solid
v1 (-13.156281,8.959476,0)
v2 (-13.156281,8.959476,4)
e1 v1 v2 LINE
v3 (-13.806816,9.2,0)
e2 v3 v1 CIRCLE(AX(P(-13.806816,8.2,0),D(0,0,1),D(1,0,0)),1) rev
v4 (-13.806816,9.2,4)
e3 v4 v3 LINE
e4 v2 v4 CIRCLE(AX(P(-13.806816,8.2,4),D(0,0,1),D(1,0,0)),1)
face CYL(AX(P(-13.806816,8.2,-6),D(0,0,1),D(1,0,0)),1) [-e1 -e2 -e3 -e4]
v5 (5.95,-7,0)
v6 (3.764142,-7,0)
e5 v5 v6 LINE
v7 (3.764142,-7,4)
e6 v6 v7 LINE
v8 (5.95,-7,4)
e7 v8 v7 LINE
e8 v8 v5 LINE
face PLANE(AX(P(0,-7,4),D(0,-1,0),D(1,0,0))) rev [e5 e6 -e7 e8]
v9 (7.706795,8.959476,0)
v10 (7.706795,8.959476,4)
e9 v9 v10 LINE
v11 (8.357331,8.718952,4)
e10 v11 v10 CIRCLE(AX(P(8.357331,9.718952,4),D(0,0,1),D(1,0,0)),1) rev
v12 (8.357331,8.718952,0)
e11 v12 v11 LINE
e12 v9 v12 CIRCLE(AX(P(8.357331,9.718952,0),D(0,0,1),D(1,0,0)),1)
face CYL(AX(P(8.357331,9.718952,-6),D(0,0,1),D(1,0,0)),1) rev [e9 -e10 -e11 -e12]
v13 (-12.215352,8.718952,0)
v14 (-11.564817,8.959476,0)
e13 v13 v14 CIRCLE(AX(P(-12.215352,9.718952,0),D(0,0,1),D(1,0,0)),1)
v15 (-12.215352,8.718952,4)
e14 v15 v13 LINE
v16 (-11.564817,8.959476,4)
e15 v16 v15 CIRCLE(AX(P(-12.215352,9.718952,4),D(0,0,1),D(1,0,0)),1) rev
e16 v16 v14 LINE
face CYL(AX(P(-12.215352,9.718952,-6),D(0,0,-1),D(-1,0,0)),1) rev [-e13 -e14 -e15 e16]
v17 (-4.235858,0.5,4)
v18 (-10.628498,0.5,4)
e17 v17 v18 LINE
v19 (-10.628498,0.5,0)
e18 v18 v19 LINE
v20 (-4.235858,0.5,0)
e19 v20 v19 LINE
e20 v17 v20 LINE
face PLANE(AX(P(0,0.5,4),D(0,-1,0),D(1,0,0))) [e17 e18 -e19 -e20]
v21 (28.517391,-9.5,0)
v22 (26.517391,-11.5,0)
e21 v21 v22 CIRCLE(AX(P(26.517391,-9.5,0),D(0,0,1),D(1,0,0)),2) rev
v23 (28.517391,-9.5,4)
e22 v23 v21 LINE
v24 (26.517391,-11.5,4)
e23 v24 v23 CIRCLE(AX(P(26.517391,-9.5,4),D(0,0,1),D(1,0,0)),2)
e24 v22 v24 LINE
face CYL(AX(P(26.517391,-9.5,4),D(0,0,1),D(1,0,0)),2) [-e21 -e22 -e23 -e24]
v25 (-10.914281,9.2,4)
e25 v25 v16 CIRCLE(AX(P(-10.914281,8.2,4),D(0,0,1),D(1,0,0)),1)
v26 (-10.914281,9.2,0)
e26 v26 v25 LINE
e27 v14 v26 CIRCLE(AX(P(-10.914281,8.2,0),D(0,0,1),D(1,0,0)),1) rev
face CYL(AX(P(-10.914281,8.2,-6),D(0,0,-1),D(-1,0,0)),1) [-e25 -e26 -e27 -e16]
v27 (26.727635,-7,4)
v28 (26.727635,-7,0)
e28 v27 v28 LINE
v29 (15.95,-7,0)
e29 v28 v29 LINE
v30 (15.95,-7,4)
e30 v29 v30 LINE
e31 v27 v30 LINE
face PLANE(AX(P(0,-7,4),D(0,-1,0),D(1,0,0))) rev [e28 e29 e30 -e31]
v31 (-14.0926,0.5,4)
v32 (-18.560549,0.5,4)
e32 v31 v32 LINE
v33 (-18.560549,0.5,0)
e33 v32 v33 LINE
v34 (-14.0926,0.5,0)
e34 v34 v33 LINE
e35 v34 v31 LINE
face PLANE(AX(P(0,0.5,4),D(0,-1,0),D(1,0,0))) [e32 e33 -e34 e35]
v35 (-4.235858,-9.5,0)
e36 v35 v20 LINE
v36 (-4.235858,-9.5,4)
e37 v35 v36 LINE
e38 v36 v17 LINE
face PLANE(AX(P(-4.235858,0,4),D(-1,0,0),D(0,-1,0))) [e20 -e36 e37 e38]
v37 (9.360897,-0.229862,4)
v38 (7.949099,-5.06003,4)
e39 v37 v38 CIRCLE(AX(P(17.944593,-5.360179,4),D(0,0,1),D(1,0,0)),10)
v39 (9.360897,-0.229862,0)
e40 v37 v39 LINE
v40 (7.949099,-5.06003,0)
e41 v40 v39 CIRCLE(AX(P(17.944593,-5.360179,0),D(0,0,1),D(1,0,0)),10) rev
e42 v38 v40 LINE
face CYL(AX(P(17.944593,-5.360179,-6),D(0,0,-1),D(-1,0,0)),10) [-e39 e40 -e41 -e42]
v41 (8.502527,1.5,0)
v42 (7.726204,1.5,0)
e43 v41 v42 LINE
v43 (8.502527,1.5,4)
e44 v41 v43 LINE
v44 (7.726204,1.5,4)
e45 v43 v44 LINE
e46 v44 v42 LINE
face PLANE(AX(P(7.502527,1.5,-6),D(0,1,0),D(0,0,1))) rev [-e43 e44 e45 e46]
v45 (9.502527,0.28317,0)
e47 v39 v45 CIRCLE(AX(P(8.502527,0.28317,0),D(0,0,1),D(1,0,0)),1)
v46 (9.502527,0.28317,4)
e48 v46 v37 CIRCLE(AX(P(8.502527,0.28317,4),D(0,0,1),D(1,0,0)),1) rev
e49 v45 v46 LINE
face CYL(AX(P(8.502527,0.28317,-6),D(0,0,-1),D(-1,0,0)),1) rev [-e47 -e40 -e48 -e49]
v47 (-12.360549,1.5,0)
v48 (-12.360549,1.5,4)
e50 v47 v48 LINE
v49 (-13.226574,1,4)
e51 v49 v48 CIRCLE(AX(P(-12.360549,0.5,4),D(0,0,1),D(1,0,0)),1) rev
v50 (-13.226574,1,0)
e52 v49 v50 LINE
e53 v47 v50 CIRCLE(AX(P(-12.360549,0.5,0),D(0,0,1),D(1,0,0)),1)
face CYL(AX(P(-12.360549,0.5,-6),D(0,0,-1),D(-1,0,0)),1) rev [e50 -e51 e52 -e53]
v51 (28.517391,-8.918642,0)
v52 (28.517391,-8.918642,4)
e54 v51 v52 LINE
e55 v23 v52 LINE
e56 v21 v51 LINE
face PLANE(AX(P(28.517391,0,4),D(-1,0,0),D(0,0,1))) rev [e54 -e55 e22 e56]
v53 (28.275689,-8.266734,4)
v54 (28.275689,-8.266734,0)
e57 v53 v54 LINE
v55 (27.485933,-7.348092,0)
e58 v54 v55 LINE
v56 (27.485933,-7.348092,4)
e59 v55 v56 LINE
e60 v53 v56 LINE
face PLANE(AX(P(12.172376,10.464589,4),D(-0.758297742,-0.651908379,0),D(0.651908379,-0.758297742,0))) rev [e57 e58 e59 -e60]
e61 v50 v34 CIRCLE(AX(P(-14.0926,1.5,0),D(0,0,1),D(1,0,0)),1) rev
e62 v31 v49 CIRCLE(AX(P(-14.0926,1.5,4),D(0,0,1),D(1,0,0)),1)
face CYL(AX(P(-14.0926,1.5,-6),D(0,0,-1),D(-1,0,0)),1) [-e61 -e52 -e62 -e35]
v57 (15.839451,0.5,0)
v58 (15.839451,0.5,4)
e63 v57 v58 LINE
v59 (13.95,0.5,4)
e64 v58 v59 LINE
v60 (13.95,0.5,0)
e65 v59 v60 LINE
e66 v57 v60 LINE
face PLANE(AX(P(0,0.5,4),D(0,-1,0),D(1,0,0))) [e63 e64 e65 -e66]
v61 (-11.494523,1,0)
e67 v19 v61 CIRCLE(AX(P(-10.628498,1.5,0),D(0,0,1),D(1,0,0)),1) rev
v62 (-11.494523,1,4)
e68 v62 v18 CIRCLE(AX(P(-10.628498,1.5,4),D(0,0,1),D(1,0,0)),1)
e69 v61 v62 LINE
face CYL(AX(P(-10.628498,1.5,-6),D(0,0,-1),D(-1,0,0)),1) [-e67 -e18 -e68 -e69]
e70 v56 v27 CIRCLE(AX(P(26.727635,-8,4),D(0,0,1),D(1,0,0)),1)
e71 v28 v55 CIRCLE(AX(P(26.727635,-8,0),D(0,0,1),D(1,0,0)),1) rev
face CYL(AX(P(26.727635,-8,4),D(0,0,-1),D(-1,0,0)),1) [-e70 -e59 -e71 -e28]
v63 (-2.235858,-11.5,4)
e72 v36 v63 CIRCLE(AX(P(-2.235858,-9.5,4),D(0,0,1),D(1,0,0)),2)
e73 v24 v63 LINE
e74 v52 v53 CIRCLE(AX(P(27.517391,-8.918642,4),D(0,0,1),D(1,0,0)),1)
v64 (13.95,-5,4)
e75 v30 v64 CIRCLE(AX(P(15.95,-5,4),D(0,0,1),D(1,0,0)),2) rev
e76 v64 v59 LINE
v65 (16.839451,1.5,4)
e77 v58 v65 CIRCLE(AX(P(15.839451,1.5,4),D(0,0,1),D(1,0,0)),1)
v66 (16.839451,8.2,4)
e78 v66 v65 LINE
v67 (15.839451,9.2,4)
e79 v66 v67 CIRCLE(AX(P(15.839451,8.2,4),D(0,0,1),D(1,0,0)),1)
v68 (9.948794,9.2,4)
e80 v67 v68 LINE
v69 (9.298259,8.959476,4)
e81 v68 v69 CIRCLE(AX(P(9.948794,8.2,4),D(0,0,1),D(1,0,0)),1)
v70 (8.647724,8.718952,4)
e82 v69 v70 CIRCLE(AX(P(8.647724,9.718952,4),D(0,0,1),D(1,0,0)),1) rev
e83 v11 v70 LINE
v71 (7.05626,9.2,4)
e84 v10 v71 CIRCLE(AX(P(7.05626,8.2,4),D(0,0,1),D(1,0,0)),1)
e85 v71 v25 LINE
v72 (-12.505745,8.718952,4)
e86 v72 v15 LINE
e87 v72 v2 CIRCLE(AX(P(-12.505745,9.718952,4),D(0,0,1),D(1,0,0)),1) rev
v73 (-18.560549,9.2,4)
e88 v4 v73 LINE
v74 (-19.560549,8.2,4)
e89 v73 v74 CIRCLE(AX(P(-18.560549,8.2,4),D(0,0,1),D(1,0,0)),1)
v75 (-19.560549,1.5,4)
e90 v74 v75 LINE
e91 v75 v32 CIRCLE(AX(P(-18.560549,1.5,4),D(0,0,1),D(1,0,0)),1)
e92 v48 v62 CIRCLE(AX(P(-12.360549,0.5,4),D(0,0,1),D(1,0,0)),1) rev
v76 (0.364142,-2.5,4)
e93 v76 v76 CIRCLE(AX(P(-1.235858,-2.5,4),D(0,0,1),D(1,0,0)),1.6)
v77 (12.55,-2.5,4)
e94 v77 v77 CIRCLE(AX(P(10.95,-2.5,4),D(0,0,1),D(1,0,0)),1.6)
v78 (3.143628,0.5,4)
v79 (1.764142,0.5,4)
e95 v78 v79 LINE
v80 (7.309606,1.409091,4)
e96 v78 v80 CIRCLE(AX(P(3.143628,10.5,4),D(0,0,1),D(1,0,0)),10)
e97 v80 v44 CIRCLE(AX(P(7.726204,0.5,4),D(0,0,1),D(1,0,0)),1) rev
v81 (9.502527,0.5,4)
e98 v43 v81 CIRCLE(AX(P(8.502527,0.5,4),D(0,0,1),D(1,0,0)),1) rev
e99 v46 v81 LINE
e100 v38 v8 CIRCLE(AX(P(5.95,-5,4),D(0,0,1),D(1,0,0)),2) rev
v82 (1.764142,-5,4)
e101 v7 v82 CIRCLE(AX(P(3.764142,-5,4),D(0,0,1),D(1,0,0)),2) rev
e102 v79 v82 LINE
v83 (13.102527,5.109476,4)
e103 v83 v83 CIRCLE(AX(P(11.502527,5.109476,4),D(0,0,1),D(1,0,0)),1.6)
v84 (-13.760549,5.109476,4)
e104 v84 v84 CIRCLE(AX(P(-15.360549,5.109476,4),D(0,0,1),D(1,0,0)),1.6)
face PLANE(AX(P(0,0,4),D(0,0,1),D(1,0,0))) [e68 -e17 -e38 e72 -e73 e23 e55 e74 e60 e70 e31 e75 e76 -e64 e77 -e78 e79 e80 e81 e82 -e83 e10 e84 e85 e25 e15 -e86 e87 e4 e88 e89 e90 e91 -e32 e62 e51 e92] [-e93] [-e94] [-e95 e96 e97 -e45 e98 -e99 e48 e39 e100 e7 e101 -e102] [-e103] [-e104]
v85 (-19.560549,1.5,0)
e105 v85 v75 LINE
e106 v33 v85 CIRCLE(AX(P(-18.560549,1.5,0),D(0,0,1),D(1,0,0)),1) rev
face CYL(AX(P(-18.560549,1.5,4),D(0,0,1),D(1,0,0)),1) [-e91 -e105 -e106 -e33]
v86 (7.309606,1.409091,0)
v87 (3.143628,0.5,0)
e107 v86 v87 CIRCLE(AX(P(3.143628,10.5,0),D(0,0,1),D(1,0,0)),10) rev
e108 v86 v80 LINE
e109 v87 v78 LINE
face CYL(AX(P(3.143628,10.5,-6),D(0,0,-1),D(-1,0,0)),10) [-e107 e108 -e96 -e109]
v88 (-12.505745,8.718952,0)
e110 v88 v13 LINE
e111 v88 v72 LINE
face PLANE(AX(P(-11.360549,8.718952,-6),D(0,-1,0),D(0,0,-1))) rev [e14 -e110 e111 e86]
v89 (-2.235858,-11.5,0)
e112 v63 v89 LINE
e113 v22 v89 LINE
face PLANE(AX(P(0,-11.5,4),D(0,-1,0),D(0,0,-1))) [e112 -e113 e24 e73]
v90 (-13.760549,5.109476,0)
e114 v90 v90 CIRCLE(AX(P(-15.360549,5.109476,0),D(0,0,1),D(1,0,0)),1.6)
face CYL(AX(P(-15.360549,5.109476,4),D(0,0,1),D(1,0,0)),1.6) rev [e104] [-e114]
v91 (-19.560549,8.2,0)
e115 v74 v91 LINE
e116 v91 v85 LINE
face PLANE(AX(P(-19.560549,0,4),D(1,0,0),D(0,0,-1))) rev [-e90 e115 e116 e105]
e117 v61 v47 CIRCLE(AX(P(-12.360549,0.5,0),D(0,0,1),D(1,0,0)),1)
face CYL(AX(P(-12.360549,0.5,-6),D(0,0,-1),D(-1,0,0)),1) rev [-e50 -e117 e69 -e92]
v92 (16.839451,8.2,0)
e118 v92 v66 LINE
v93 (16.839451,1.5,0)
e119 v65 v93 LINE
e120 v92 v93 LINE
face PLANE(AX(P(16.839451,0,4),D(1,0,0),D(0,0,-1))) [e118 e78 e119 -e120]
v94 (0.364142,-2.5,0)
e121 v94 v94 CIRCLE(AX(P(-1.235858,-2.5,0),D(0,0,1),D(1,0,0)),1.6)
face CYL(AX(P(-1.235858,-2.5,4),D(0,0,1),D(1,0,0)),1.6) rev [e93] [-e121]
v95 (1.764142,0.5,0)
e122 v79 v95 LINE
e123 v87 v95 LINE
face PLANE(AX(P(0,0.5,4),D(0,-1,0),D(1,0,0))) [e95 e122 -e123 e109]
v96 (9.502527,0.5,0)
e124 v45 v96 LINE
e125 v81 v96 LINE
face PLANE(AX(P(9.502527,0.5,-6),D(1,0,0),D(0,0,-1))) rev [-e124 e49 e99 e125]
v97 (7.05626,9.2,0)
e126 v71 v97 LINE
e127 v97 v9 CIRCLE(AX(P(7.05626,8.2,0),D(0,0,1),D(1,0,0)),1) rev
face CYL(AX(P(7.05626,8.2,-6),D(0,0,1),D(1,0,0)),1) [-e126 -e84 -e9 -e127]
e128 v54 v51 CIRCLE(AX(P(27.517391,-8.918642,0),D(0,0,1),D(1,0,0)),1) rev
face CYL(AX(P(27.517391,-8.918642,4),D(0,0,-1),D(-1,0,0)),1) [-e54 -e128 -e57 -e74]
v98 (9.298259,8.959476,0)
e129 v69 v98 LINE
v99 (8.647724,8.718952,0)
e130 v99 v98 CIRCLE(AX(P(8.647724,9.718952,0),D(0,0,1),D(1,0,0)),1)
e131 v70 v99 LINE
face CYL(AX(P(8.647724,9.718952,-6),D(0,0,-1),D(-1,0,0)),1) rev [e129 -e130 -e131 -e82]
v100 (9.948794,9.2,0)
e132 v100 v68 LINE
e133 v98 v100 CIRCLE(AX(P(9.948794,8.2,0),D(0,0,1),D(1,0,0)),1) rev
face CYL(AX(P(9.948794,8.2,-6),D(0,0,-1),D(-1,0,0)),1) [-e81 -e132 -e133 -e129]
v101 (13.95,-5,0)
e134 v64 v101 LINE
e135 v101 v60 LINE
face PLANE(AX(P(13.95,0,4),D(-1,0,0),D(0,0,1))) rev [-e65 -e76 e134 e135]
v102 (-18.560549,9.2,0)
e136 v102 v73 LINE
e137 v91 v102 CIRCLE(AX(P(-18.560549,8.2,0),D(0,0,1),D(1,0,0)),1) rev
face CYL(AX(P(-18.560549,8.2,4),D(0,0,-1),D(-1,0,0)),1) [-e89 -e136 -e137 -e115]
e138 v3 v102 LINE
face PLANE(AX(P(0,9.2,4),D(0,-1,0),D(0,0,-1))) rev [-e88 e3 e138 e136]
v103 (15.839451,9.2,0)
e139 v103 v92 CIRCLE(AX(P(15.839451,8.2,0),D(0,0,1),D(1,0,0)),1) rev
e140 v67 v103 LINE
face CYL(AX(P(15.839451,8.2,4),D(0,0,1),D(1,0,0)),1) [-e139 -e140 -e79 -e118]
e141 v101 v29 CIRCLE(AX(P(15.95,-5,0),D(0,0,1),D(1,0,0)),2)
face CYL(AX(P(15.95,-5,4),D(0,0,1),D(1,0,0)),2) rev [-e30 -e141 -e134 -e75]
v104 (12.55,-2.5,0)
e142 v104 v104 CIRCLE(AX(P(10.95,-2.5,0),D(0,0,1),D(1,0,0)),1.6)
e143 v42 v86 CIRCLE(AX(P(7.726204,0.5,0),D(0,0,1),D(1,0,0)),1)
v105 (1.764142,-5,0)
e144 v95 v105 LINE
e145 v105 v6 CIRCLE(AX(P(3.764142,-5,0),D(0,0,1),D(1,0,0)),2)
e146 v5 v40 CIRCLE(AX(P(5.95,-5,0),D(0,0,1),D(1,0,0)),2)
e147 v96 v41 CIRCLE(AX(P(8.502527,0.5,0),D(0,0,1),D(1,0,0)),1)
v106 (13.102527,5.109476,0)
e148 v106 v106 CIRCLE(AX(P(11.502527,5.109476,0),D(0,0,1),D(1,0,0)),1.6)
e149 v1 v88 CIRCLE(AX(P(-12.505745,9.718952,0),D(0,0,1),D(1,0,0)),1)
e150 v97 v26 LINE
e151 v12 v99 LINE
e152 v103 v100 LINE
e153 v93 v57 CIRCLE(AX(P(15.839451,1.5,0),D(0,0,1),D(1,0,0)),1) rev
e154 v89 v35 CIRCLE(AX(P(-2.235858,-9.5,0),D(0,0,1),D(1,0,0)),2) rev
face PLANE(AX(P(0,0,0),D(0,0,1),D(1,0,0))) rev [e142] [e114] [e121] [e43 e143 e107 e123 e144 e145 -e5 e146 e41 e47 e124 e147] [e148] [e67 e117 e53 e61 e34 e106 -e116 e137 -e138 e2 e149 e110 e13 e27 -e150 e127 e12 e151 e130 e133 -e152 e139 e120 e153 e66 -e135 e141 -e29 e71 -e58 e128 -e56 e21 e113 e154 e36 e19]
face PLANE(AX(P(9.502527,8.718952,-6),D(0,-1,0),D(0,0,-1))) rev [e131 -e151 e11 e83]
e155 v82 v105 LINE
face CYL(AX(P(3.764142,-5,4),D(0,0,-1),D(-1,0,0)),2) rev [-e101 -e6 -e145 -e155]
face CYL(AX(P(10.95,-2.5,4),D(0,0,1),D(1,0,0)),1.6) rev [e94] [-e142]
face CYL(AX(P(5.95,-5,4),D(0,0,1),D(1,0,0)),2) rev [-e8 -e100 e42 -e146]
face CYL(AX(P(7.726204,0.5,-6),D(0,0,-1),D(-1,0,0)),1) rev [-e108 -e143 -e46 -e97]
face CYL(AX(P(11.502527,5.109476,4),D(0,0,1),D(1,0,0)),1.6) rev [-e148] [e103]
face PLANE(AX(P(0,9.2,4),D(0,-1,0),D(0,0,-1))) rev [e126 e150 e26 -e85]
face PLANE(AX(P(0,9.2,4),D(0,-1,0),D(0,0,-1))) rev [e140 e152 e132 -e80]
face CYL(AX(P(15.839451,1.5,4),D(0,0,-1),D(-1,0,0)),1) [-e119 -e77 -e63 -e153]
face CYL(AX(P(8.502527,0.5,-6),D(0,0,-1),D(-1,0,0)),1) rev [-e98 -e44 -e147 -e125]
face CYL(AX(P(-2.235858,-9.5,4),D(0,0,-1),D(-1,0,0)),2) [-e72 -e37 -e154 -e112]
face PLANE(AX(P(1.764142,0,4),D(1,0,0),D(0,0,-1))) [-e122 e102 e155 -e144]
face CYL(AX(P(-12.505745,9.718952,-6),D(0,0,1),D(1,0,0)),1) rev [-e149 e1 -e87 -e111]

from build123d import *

# Parameters (mm, degrees)
SKETCH1_W            = 6.185857864
SKETCH1_H            = 7.5
BOSS_EXTRUDE1_DEPTH  = 4
FILLET1_R            = 2
M3_CLEARANCE_HOLE1_D = 3.2
SKETCH4_W            = 2
SKETCH4_H            = 0.481048
SKETCH4_H_2          = 1
CUT_EXTRUDE1_DEPTH   = 10
FILLET2_R            = 10
FILLET3_R            = 1
FILLET4_R            = 1


with BuildPart() as part:
    # Sketch1 → Boss-Extrude1 (new body)
    with BuildSketch(Plane.XY):
        Polygon((-4.235857864, -11.50026715), (-4.235857864, 0.5), (-19.56054874, 0.5), (-19.56054874, 9.2), (16.83945126, 9.2), (16.83945126, 0.5), (13.95, 0.5), (13.95, -7), (27.186678327, -7), (28.517391444, -8.547881241), (28.517391444, -11.5), align=None)
        with Locations((4.857071068, -3.25)):
            Rectangle(SKETCH1_W, SKETCH1_H, mode=Mode.SUBTRACT)
    extrude(amount=BOSS_EXTRUDE1_DEPTH)

    # Fillet1
    fillet1_edges = [part.edges().sort_by_distance(p)[0] for p in [
        (1.764142136, -7, 2),
        (7.95, -7, 2),
        (-4.235857864, -11.50026715, 2),
        (13.95, -7, 2),
        (28.517391444, -11.5, 2),
    ]]
    fillet(fillet1_edges, radius=FILLET1_R)

    # M3 Clearance Hole1 (through all)
    with Locations(Plane.XY.offset(4)):
        with Locations((10.95, -2.5), (-1.235857864, -2.5), (11.502527164, 5.109476), (-15.36054874, 5.109476)):
            Hole(M3_CLEARANCE_HOLE1_D / 2)

    # Sketch4 → Cut-Extrude1 (cut)
    with BuildSketch(Plane.XY.offset(4)):
        with Locations((8.502527164, 8.959476)):
            Rectangle(SKETCH4_W, SKETCH4_H)
        with Locations((-12.36054874, 8.959476)):
            Rectangle(SKETCH4_W, SKETCH4_H)
        with Locations((-12.36054874, 1)):
            Rectangle(SKETCH4_W, SKETCH4_H_2)
        Polygon((7.502527164, 0.5), (7.502527164, 1.5), (9.502527164, 1.5), (9.502527164, 0.5), (9.502527164, 0), (7.502527164, 0), align=None)
    extrude(amount=-CUT_EXTRUDE1_DEPTH, mode=Mode.SUBTRACT)

    # Fillet2
    # the kernel refuses this fillet: 10 mm, written as the material it takes off along each edge
    with BuildSketch(Plane(origin=(7.502527164, 0.5, -10.897247359), x_dir=(-1, 0, 0), z_dir=(0, 0, 1))) as fillet2_piece_1:
        with BuildLine():
            CenterArc((4.358898944, -10), FILLET2_R, 90, 25.841932763)
            Line((0, -1), (0, 0))
            Line((0, 0), (4.358898944, 0))
        make_face()
    extrude(amount=25.794494718, mode=Mode.SUBTRACT)
    with BuildSketch(Plane(origin=(7.95, 0, 16.650074726), x_dir=(1.0, -2.8096218791575343e-12, 0), z_dir=(0, 0, -1))) as fillet2_piece_2:
        with BuildLine():
            CenterArc((9.994593415, 5.36017886), FILLET2_R, 181.719985699, 30.692982598)
            Line((-0.000901098, 5.06002981), (-1.000450549, 5.030014905))
            ThreePointArc((-1.000450549, 5.030014905), (-1, 5), (-1, 0))
            Line((-1, 0), (0, -1))
            ThreePointArc((0, -1), (0.776263582, -1), (0.708320539, -0.536017886))
            Line((0.708320539, -0.536017886), (1.552527164, 0))
        make_face()
    extrude(amount=29.300149451, mode=Mode.SUBTRACT)

    # Fillet3
    # the kernel refuses this fillet: 1 mm, written as the material it adds along each edge
    with BuildSketch(Plane(origin=(9.502527164, 0, 4), x_dir=(0, 1, 0), z_dir=(0, 0, -1))) as fillet3_piece_1:
        with BuildLine():
            CenterArc((0.283169872, -1), FILLET3_R, 90, 30.865981789)
            ThreePointArc((-0.229861831, -0.141630341), (-0.114452906, -0.071590966), (0, 0))
            Line((0, 0), (0.283169872, 0))
        make_face()
    extrude(amount=4)
    with BuildSketch(Plane(origin=(9.502527164, 1.5, 4), x_dir=(-1, 0, 0), z_dir=(0, 0, -1))) as fillet3_piece_2:
        with BuildLine():
            CenterArc((FILLET3_R, -FILLET3_R), FILLET3_R, 90, 90)
            Line((0, -FILLET3_R), (0, 0))
            Line((0, 0), (FILLET3_R, 0))
        make_face()
    extrude(amount=4)
    with BuildSketch(Plane(origin=(7.502527164, 1.5, 4), x_dir=(-0.9045968857212806, -0.42626807802527333, 0), z_dir=(0, 0, -1))) as fillet3_piece_3:
        with BuildLine():
            CenterArc((0.223930785, -0.999943145), FILLET3_R, 90.610977717, 24.619977329)
            Line((-0.202337293, -0.095346259), (0, 0))
            ThreePointArc((0, 0), (0.106633707, -0.000568554), (0.213267415, 0))
        make_face()
    extrude(amount=4)
    with BuildSketch(Plane(origin=(-13.36054874, 8.718952, 4), x_dir=(0, 1, 0), z_dir=(0, 0, -1))) as fillet3_piece_4:
        with BuildLine():
            CenterArc((1, 0.854803382), FILLET3_R, 180, 58.738020049)
            Line((0, 0.854803382), (0, 0))
            Line((0, 0), (0.481048, 0))
        make_face()
    extrude(amount=4)
    with BuildSketch(Plane(origin=(-11.36054874, 8.718952, 4), x_dir=(-1, 0, 0), z_dir=(0, 0, -1))) as fillet3_piece_5:
        with BuildLine():
            CenterArc((0.854803382, 1), FILLET3_R, 211.261979951, 58.738020049)
            Line((0, 0.481048), (0, 0))
            Line((0, 0), (0.854803382, 0))
        make_face()
    extrude(amount=4)
    with BuildSketch(Plane(origin=(9.502527164, 8.718952, 4), x_dir=(0, 1, 0), z_dir=(0, 0, -1))) as fillet3_piece_6:
        with BuildLine():
            CenterArc((1, -0.854803382), FILLET3_R, 121.261979951, 58.738020049)
            Line((0, -0.854803382), (0, 0))
            Line((0, 0), (0.481048, 0))
        make_face()
    extrude(amount=4)
    with BuildSketch(Plane(origin=(7.502527164, 8.718952, 4), x_dir=(1, 0, 0), z_dir=(0, 0, -1))) as fillet3_piece_7:
        with BuildLine():
            CenterArc((0.854803382, -1), FILLET3_R, 90, 58.738020049)
            Line((0, -0.481048), (0, 0))
            Line((0, 0), (0.854803382, 0))
        make_face()
    extrude(amount=4)
    with BuildSketch(Plane(origin=(-13.36054874, 1.5, 4), x_dir=(1, 0, 0), z_dir=(0, 0, -1)), Plane(origin=(-11.36054874, 1.5, 4), x_dir=(0, -1, 0), z_dir=(0, 0, -1))) as fillet3_piece_8:
        with BuildLine():
            CenterArc((FILLET3_R, FILLET3_R), FILLET3_R, 180, 90)
            Line((0, FILLET3_R), (0, 0))
            Line((0, 0), (FILLET3_R, 0))
        make_face()
    extrude(amount=4)
    # the kernel refuses this fillet: 1 mm, written as the material it takes off along each edge
    with BuildSketch(Plane(origin=(28.517391444, -8.547881241, -0.926902713), x_dir=(0, -1, 0), z_dir=(0, 0, 1))) as fillet3_2_piece_1:
        with BuildLine():
            CenterArc((FILLET3_R * 0.370761085346, -FILLET3_R), FILLET3_R, 90, 40.685640486)
            Line((-FILLET3_R * 0.28114729377, -FILLET3_R * 0.241702258187), (0, 0))
            Line((0, 0), (FILLET3_R * 0.370761085346, 0))
        make_face()
    extrude(amount=5.853805427, mode=Mode.SUBTRACT)
    with BuildSketch(Plane(origin=(27.186678327, -7, -1.147608656), x_dir=(0.6519083791154829, -0.7582977418132165, 0), z_dir=(0, 0, 1))) as fillet3_2_piece_2:
        with BuildLine():
            CenterArc((FILLET3_R * 0.459043462337, -FILLET3_R), FILLET3_R, 90, 49.314359514)
            Line((-FILLET3_R * 0.299254279476, -FILLET3_R * 0.348091620885), (0, 0))
            Line((0, 0), (FILLET3_R * 0.459043462337, 0))
        make_face()
    extrude(amount=6.295217312, mode=Mode.SUBTRACT)
    with BuildSketch(Plane(origin=(-19.56054874, 0.5, -2.5), x_dir=(0, 1, 0), z_dir=(0, 0, 1)), Plane(origin=(-19.56054874, 9.2, -2.5), x_dir=(1, 0, 0), z_dir=(0, 0, 1)), Plane(origin=(16.83945126, 9.2, -2.5), x_dir=(0, -1, 0), z_dir=(0, 0, 1)), Plane(origin=(16.83945126, 0.5, -2.5), x_dir=(-1, 0, 0), z_dir=(0, 0, 1))) as fillet3_2_piece_3:
        with BuildLine():
            CenterArc((FILLET3_R, -FILLET3_R), FILLET3_R, 90, 90)
            Line((0, -FILLET3_R), (0, 0))
            Line((0, 0), (FILLET3_R, 0))
        make_face()
    extrude(amount=9, mode=Mode.SUBTRACT)

    # Fillet4
    fillet4_edges = [part.edges().sort_by_distance(p)[0] for p in [
        (9.502527164, 9.2, 2),
        (7.502527164, 9.2, 2),
        (-11.36054874, 9.2, 2),
        (-13.36054874, 9.2, 2),
        (-13.36054874, 0.5, 2),
        (-11.36054874, 0.5, 2),
    ]]
    fillet(fillet4_edges, radius=FILLET4_R)


solid = part.part
